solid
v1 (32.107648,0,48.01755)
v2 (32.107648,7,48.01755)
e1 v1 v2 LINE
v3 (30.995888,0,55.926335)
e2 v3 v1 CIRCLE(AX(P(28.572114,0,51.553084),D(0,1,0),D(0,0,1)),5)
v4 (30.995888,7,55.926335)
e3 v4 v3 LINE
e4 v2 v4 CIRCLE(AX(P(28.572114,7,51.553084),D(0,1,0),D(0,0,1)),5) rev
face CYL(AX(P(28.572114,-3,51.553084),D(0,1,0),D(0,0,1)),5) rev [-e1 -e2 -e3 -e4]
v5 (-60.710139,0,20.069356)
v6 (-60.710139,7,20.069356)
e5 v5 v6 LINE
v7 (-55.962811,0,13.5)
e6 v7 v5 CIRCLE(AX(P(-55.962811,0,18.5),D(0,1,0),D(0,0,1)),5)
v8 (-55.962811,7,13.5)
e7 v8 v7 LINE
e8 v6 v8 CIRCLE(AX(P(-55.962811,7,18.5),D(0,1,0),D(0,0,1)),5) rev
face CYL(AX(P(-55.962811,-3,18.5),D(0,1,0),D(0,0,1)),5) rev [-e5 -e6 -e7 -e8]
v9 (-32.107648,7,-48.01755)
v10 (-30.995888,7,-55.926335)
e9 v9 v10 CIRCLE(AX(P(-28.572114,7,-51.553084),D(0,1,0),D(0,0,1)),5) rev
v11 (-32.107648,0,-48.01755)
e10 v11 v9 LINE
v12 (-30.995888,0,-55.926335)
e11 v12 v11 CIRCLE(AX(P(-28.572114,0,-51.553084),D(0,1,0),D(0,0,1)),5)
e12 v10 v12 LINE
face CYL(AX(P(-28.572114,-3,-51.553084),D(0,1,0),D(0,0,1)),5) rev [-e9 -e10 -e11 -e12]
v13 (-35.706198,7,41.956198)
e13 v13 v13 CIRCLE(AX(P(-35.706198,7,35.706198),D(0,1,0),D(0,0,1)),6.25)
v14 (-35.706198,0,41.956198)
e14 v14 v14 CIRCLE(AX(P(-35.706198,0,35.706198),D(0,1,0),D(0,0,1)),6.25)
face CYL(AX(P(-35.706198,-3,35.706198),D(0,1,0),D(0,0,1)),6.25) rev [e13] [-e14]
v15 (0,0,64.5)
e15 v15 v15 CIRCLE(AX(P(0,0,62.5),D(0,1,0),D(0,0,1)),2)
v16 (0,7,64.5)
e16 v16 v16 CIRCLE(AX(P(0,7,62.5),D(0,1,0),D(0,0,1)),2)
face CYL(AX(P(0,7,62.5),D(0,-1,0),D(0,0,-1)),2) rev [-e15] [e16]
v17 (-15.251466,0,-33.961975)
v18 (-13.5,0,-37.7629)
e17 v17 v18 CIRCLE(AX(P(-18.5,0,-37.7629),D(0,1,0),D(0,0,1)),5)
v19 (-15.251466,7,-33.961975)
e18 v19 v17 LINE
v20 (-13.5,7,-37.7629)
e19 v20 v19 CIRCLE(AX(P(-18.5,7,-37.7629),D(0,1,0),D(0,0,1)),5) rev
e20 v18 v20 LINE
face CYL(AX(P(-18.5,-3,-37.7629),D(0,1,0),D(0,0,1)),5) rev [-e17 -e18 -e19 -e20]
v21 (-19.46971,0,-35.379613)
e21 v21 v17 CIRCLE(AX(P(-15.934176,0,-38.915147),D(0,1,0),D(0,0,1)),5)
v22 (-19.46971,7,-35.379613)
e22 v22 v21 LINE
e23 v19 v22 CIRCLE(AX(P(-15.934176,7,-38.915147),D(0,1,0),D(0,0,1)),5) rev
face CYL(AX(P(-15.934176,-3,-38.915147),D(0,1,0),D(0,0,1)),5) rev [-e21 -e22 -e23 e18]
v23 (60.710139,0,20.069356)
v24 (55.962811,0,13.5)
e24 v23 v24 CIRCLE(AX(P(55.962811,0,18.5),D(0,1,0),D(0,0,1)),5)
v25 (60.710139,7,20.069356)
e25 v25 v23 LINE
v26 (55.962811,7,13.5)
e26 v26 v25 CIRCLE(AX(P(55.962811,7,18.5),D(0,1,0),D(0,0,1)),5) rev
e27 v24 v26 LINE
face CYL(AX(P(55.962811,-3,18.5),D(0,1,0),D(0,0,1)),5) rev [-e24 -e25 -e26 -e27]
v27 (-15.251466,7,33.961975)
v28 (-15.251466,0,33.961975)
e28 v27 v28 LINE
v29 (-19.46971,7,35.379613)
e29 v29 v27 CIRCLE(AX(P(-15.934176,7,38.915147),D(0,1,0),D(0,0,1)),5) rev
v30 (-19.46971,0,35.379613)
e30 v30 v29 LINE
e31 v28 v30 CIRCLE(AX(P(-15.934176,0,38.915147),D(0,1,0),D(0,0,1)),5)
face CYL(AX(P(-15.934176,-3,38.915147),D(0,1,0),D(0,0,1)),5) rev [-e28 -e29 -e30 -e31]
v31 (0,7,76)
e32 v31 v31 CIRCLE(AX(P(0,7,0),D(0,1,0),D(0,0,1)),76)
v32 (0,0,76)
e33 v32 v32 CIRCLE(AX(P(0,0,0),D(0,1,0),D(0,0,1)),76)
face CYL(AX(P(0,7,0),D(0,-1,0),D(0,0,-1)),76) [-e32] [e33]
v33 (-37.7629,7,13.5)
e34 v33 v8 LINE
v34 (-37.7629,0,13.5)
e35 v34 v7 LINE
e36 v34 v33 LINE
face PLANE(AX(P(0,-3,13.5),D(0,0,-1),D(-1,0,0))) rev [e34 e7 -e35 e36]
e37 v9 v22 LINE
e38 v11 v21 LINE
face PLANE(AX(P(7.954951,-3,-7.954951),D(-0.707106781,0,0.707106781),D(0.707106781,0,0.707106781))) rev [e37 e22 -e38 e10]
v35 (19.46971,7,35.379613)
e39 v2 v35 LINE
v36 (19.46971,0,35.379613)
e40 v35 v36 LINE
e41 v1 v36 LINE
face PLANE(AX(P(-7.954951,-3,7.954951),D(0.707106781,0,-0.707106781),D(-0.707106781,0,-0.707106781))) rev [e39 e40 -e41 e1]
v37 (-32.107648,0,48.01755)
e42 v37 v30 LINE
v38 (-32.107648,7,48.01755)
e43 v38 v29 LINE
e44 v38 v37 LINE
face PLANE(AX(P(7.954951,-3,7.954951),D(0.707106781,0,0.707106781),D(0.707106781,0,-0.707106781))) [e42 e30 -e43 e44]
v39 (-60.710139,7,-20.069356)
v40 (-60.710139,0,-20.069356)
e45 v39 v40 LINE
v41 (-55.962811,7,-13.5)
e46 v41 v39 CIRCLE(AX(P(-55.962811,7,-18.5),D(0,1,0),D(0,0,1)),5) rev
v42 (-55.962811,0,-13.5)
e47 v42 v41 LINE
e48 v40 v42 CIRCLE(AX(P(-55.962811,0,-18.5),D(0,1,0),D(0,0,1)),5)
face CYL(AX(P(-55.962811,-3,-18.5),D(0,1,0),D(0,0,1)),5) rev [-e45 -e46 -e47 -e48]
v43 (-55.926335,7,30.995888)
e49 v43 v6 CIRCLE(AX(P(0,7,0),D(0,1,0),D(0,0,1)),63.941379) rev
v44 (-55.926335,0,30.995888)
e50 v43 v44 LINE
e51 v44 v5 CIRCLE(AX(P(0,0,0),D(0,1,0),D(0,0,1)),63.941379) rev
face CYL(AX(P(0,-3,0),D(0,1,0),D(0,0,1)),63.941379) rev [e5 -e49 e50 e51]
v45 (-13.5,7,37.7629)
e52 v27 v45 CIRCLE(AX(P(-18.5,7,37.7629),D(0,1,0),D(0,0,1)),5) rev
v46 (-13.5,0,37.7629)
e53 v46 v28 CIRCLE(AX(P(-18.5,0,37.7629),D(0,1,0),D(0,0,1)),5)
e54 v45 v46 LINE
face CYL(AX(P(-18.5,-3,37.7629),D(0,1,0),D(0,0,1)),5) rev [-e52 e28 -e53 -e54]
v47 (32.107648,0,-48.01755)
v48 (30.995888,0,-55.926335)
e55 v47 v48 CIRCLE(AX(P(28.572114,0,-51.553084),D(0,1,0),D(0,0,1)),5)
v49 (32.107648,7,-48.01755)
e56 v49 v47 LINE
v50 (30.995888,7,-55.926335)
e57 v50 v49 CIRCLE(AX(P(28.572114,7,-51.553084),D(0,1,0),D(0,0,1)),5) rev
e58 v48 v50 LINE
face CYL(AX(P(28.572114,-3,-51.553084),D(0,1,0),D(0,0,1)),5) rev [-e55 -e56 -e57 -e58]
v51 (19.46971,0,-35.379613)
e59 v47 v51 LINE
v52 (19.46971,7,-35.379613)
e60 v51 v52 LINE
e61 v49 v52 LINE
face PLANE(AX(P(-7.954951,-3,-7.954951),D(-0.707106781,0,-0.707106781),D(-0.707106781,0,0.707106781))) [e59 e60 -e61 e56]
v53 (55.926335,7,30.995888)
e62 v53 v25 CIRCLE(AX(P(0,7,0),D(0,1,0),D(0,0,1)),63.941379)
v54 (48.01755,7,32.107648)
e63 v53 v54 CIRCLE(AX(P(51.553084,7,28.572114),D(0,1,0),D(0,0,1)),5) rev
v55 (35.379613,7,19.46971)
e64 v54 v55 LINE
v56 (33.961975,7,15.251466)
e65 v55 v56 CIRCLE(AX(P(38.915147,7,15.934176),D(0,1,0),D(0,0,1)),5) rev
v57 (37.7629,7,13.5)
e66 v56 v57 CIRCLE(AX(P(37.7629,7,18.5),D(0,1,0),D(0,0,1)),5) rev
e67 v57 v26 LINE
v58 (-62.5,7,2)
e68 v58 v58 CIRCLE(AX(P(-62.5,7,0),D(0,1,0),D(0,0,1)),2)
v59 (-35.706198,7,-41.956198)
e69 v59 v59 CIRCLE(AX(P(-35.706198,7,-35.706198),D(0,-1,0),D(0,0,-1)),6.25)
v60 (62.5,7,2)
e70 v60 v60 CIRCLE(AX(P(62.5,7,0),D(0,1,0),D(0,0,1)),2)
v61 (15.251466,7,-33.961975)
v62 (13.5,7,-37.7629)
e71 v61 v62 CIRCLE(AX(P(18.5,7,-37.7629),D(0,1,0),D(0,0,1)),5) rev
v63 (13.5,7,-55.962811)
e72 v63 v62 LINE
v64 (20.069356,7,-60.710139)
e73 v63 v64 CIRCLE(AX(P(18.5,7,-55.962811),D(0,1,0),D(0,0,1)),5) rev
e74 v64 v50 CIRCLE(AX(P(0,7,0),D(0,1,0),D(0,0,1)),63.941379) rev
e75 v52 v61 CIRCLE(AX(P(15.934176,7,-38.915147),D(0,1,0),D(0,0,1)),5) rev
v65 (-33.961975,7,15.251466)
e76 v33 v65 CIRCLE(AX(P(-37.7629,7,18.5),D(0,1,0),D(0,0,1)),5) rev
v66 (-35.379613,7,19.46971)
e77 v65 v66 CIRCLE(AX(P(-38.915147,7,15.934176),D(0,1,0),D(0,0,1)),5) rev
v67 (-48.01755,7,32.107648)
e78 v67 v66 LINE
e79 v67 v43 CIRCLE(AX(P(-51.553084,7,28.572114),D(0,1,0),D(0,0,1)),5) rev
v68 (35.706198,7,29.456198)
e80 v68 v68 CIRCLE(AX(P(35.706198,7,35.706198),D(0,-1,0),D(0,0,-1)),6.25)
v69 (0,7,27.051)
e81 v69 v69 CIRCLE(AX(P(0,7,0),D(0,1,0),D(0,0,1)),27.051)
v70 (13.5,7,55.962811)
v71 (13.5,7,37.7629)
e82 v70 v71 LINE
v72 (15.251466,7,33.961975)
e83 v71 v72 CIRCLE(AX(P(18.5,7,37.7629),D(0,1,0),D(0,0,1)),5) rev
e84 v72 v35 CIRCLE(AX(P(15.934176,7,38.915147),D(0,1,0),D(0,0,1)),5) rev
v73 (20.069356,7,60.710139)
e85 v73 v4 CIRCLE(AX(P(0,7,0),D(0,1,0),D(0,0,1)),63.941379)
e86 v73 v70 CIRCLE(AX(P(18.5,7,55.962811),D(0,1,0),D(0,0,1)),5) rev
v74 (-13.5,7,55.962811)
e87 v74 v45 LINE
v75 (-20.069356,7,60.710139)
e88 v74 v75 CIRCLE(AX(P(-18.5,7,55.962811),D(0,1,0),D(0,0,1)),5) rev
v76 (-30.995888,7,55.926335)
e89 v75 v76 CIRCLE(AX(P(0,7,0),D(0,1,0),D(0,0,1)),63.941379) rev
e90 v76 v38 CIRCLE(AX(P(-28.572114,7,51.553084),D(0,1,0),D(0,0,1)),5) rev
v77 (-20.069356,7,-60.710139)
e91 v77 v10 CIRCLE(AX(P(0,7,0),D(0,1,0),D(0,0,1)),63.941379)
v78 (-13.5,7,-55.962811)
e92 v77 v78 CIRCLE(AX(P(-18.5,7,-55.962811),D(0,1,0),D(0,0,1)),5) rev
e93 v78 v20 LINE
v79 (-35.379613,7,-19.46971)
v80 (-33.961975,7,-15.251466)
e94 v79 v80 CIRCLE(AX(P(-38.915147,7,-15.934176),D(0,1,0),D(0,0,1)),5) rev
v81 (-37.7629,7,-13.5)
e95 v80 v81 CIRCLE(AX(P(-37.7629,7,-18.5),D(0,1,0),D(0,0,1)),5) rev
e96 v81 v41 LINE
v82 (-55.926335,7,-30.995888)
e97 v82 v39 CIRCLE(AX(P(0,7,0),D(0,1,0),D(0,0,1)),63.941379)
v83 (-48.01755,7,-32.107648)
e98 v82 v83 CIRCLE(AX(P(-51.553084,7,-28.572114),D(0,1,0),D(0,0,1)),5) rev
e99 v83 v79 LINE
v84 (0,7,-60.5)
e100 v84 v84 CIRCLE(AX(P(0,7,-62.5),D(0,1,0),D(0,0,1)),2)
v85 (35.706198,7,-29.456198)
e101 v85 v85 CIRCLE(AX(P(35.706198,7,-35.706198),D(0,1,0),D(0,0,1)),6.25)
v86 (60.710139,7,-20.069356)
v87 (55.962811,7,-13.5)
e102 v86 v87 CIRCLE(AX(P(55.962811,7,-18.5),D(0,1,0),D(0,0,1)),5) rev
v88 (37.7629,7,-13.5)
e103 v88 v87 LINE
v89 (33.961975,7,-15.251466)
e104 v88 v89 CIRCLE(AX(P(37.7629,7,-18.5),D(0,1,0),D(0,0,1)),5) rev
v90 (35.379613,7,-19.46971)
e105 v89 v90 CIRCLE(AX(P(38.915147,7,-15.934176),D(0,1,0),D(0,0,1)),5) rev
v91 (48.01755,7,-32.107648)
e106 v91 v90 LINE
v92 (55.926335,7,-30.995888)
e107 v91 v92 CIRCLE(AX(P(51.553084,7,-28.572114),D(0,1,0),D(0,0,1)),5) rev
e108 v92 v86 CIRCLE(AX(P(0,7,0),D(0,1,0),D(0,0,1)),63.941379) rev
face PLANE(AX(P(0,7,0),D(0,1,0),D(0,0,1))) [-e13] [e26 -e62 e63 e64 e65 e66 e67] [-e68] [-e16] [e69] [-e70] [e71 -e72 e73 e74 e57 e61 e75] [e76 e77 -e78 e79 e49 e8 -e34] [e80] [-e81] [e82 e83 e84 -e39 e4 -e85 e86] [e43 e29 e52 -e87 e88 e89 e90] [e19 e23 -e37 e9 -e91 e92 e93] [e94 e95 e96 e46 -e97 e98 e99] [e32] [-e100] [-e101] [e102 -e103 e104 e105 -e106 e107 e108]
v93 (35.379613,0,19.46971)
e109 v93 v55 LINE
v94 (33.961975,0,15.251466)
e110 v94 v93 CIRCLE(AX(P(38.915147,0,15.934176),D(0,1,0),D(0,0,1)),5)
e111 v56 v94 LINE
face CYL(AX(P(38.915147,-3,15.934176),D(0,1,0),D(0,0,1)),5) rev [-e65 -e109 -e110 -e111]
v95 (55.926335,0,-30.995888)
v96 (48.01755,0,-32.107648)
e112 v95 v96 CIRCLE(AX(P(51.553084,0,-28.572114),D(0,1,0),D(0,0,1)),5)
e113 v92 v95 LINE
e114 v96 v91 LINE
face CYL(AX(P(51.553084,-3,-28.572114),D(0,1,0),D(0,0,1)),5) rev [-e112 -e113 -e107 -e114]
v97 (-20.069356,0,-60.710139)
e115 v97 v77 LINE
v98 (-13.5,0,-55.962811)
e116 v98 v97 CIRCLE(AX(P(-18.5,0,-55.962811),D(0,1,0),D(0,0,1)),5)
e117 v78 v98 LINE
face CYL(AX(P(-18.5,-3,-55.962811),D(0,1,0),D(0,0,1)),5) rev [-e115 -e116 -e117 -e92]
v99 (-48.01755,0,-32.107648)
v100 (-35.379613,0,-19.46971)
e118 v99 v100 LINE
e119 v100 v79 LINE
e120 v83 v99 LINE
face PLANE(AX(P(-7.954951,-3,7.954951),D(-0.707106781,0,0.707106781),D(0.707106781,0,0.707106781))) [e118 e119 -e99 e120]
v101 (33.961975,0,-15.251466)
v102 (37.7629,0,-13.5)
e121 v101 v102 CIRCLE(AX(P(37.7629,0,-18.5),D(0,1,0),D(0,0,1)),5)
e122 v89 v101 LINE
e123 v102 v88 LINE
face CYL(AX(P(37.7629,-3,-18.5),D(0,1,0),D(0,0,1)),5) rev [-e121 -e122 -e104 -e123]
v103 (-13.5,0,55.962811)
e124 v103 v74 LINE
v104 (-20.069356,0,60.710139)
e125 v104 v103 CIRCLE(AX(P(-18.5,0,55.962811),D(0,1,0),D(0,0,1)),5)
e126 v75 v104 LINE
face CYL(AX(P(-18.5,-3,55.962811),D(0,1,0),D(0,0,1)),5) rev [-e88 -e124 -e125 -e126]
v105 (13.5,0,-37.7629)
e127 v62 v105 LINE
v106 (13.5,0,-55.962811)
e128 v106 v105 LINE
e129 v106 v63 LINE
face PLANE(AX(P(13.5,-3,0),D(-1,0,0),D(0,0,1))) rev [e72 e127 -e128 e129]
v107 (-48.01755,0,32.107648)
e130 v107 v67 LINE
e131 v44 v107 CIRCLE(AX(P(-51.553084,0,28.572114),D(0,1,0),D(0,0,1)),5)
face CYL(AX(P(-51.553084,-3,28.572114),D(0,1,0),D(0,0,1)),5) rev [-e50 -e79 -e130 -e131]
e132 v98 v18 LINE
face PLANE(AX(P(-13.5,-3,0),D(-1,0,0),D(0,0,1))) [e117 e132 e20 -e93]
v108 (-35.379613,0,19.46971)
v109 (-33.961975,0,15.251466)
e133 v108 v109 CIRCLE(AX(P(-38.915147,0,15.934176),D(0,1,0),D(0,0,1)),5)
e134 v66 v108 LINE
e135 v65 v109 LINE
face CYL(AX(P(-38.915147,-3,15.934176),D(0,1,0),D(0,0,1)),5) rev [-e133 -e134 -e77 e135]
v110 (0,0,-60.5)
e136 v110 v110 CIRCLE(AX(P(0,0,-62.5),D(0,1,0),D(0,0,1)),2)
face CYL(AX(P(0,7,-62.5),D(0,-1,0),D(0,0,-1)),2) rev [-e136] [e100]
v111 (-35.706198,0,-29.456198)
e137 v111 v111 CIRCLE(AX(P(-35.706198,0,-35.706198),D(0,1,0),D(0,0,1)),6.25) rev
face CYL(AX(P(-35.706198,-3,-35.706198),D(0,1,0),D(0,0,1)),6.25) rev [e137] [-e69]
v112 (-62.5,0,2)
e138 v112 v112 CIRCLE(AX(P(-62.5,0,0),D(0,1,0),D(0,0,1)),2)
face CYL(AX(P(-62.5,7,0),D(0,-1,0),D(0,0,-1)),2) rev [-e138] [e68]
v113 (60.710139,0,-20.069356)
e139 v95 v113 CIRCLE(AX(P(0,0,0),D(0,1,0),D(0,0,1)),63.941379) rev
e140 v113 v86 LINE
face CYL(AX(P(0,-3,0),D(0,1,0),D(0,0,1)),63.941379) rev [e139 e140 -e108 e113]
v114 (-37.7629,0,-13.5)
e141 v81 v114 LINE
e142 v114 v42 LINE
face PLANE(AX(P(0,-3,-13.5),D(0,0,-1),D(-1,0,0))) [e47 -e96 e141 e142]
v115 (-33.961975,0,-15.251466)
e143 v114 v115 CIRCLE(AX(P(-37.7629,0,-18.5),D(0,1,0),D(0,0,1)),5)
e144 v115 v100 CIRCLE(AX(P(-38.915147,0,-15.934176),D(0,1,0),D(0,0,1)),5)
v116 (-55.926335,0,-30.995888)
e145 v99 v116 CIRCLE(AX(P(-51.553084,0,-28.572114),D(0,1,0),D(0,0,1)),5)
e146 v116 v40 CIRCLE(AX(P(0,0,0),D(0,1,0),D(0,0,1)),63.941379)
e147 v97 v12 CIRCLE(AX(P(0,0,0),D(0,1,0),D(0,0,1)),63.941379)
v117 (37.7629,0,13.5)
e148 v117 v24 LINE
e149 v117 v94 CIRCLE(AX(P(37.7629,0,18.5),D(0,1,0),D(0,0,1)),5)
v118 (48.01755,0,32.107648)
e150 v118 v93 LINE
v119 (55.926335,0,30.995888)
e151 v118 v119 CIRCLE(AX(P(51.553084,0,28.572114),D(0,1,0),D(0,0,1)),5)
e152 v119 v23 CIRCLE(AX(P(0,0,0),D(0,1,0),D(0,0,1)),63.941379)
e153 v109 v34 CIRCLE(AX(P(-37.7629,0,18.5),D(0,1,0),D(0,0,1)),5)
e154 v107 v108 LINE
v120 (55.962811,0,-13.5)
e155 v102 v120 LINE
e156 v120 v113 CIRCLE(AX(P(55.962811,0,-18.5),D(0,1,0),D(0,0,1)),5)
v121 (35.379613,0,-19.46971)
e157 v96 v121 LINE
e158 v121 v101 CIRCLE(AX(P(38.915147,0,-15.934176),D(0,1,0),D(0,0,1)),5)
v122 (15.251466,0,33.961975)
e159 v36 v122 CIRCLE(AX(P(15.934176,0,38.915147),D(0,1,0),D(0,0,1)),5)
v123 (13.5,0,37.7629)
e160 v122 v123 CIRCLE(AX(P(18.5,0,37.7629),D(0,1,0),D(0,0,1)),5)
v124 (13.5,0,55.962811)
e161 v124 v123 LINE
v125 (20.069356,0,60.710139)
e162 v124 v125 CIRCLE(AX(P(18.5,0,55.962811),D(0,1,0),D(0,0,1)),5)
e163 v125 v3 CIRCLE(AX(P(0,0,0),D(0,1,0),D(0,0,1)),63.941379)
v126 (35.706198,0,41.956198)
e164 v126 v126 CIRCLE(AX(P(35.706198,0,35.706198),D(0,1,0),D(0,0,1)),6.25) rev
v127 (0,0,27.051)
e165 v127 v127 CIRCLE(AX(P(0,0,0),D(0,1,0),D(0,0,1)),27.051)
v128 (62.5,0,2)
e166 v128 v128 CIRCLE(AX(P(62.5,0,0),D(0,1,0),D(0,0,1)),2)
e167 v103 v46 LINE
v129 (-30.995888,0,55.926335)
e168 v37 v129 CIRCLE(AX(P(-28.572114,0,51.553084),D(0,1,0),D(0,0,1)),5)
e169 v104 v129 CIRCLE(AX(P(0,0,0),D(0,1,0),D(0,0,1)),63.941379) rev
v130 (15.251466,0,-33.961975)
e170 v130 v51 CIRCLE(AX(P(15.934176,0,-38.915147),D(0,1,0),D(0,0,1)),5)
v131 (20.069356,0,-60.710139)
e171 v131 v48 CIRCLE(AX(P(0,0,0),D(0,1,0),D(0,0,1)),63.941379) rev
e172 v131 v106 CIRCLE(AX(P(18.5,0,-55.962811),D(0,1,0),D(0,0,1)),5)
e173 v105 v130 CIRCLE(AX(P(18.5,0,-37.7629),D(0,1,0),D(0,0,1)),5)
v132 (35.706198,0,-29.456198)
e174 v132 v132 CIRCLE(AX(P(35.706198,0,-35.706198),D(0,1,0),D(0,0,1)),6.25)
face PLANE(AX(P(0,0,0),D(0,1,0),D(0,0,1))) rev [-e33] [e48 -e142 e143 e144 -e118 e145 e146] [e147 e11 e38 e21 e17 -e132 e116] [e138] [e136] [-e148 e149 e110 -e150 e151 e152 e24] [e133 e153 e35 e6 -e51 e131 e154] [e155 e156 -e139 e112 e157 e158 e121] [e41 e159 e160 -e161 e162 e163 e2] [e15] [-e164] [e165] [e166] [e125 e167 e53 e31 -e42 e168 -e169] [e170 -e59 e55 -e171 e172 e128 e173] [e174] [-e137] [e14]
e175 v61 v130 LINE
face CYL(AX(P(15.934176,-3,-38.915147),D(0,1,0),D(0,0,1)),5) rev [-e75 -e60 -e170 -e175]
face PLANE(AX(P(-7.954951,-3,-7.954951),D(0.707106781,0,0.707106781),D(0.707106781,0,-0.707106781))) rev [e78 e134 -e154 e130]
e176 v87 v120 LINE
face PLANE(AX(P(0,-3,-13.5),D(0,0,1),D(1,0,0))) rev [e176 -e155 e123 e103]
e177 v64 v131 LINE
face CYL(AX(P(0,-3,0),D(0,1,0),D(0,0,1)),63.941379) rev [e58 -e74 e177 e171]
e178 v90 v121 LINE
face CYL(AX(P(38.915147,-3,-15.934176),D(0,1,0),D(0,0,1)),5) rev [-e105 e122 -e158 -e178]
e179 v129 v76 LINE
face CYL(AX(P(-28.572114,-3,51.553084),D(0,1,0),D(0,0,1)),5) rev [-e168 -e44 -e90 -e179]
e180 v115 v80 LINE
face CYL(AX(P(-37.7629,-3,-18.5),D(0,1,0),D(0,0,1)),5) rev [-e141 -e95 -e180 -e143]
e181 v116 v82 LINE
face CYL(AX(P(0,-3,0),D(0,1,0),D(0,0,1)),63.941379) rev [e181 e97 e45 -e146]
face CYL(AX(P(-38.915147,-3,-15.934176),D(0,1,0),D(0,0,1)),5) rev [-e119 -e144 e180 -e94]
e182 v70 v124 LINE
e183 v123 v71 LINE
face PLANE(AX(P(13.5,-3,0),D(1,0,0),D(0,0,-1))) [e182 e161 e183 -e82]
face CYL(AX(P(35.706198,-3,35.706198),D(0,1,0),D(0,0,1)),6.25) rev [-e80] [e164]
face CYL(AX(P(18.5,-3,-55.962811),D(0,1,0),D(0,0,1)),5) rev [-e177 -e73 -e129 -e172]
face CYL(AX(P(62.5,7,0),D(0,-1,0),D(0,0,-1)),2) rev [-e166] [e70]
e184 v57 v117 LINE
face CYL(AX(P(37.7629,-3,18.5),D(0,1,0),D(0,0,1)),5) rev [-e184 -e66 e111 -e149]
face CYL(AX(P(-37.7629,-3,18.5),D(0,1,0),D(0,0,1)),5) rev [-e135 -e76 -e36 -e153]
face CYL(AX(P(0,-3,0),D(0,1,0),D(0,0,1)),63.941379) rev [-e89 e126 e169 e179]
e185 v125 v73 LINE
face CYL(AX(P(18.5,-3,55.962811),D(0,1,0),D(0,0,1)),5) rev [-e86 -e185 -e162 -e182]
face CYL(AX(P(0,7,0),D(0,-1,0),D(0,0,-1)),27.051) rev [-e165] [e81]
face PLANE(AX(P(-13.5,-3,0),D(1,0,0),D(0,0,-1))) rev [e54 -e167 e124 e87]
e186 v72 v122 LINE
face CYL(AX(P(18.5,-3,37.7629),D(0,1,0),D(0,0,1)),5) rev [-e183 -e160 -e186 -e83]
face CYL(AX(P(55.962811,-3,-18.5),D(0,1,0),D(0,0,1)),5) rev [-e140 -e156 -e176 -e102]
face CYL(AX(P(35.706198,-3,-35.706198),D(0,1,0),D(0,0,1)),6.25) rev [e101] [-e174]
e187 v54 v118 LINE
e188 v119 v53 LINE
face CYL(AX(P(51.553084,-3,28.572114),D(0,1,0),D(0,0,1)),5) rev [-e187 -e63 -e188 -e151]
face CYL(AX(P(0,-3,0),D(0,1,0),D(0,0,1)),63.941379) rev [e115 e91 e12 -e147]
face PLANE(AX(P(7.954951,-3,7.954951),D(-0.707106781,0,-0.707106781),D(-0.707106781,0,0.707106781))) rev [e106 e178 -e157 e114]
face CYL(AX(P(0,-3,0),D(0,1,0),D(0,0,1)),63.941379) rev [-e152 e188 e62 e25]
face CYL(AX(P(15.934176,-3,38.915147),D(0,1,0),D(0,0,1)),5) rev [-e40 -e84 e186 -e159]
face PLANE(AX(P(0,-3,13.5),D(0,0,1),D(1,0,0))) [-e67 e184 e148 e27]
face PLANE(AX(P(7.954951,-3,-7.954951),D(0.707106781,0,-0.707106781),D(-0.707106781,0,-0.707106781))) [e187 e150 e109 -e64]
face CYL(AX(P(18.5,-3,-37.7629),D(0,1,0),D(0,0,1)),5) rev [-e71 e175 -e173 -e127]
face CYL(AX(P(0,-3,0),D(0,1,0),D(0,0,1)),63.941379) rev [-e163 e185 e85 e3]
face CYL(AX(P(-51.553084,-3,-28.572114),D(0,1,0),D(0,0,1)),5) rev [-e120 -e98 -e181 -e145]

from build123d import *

# Parameters (mm, degrees)
SKETCH1_R           = 76
SKETCH1_R_2         = 27.051
SKETCH1_R_3         = 2
BOSS_EXTRUDE1_DEPTH = 7
SKETCH4_R           = 6.25
CUT_EXTRUDE1_DEPTH  = 10
FILLET1_R           = 5


with BuildPart() as part:
    # Sketch1 → Boss-Extrude1 (new body)
    with BuildSketch(Plane(origin=(0, 0, 0), x_dir=(1, 0, 0), z_dir=(0, 1, 0))):
        with Locations(Location((0, 0, 0), (0, 0, 270))):
            Circle(SKETCH1_R)
        with Locations(Location((0, 0, 0), (0, 0, 270))):
            Circle(SKETCH1_R_2, mode=Mode.SUBTRACT)
        with Locations(Location((0, 62.5, 0), (0, 0, 270))):
            Circle(SKETCH1_R_3, mode=Mode.SUBTRACT)
        with Locations(Location((62.5, 0, 0), (0, 0, 270))):
            Circle(SKETCH1_R_3, mode=Mode.SUBTRACT)
        with Locations(Location((0, -62.5, 0), (0, 0, 270))):
            Circle(SKETCH1_R_3, mode=Mode.SUBTRACT)
        with Locations(Location((-62.5, 0, 0), (0, 0, 270))):
            Circle(SKETCH1_R_3, mode=Mode.SUBTRACT)
    extrude(amount=BOSS_EXTRUDE1_DEPTH)

    # Sketch4 → Cut-Extrude1 (cut)
    with BuildSketch(Plane(origin=(0, 7, 0), x_dir=(1, 0, 0), z_dir=(0, 1, 0))):
        with BuildLine():
            Line((27.751246841, -43.661149418), (17.007161012, -32.917063589))
            ThreePointArc((17.007161012, -32.917063589), (15.274204293, -33.756114768), (13.5, -34.504008477))
            Line((13.5, -34.504008477), (13.5, -62.5))
            ThreePointArc((13.5, -62.5), (25.524772494, -58.625813335), (36.553123822, -52.463026398))
            Line((36.553123822, -52.463026398), (27.751246841, -43.661149418))
        make_face()
        with BuildLine():
            Line((62.5, -13.5), (34.504008477, -13.5))
            ThreePointArc((34.504008477, -13.5), (33.756114768, -15.274204293), (32.917063589, -17.007161012))
            Line((32.917063589, -17.007161012), (43.66114941, -27.751246833))
            Line((43.66114941, -27.751246833), (52.463026398, -36.553123822))
            ThreePointArc((52.463026398, -36.553123822), (58.625813335, -25.524772494), (62.5, -13.5))
        make_face()
        with BuildLine():
            ThreePointArc((-13.5, -34.504008477), (-15.274204293, -33.756114768), (-17.007161012, -32.917063589))
            Line((-17.007161012, -32.917063589), (-27.751246874, -43.66114945))
            Line((-27.751246874, -43.66114945), (-36.553123822, -52.463026398))
            ThreePointArc((-36.553123822, -52.463026398), (-25.524772494, -58.625813335), (-13.5, -62.5))
            Line((-13.5, -62.5), (-13.5, -34.504008477))
        make_face()
        with BuildLine():
            ThreePointArc((-32.917063589, -17.007161012), (-33.756114768, -15.274204293), (-34.504008477, -13.5))
            Line((-34.504008477, -13.5), (-62.5, -13.5))
            ThreePointArc((-62.5, -13.5), (-58.625813335, -25.524772494), (-52.463026398, -36.553123822))
            Line((-52.463026398, -36.553123822), (-43.661149471, -27.751246894))
            Line((-43.661149471, -27.751246894), (-32.917063589, -17.007161012))
        make_face()
        with BuildLine():
            ThreePointArc((-34.504008477, 13.5), (-33.756114768, 15.274204293), (-32.917063589, 17.007161012))
            Line((-32.917063589, 17.007161012), (-43.66114943, 27.751246854))
            Line((-43.66114943, 27.751246854), (-52.463026398, 36.553123822))
            ThreePointArc((-52.463026398, 36.553123822), (-58.625813335, 25.524772494), (-62.5, 13.5))
            Line((-62.5, 13.5), (-34.504008477, 13.5))
        make_face()
        with BuildLine():
            ThreePointArc((-17.007161012, 32.917063589), (-15.274204293, 33.756114768), (-13.5, 34.504008477))
            Line((-13.5, 34.504008477), (-13.5, 62.5))
            ThreePointArc((-13.5, 62.5), (-25.524772494, 58.625813335), (-36.553123822, 52.463026398))
            Line((-36.553123822, 52.463026398), (-27.751246874, 43.66114945))
            Line((-27.751246874, 43.66114945), (-17.007161012, 32.917063589))
        make_face()
        with BuildLine():
            ThreePointArc((36.553123822, 52.463026398), (25.524772494, 58.625813335), (13.5, 62.5))
            Line((13.5, 62.5), (13.5, 34.504008477))
            ThreePointArc((13.5, 34.504008477), (15.274204293, 33.756114768), (17.007161012, 32.917063589))
            Line((17.007161012, 32.917063589), (27.751246906, 43.661149483))
            Line((27.751246906, 43.661149483), (36.553123822, 52.463026398))
        make_face()
        with BuildLine():
            ThreePointArc((62.5, 13.5), (58.625813335, 25.524772494), (52.463026398, 36.553123822))
            Line((52.463026398, 36.553123822), (43.66114945, 27.751246874))
            Line((43.66114945, 27.751246874), (32.917063589, 17.007161012))
            ThreePointArc((32.917063589, 17.007161012), (33.756114768, 15.274204293), (34.504008477, 13.5))
            Line((34.504008477, 13.5), (62.5, 13.5))
        make_face()
        with Locations(Location((35.706198162, 35.706198162, 0), (0, 0, 270))):
            Circle(SKETCH4_R)
        with Locations(Location((35.706198162, -35.706198162, 0), (0, 0, 270))):
            Circle(SKETCH4_R)
        with Locations(Location((-35.706198162, -35.706198162, 0), (0, 0, 270))):
            Circle(SKETCH4_R)
        with Locations(Location((-35.706198162, 35.706198162, 0), (0, 0, 270))):
            Circle(SKETCH4_R)
    extrude(amount=-CUT_EXTRUDE1_DEPTH, mode=Mode.SUBTRACT)

    # Fillet1
    # the kernel refuses this fillet: 5 mm, written as the material it adds along each edge
    with BuildSketch(Plane(origin=(34.504008477, 7, 13.5), x_dir=(1, 0, 0), z_dir=(0, -1, 0)), Plane(origin=(13.5, 7, -34.504008477), x_dir=(0, 0, -1), z_dir=(0, -1, 0)), Plane(origin=(-34.504008477, 7, -13.5), x_dir=(-1, 0, 0), z_dir=(0, -1, 0)), Plane(origin=(-13.5, 7, 34.504008477), x_dir=(0, 0, 1), z_dir=(0, -1, 0))) as fillet1_piece_1:
        with BuildLine():
            CenterArc((3.258891319, 5), FILLET1_R, 206.100178987, 63.899821013)
            ThreePointArc((-1.231239688, 2.800290124), (-0.586707725, 1.412857227), (0, 0))
            Line((0, 0), (3.258891319, 0))
        make_face()
    extrude(amount=7)
    with BuildSketch(Plane(origin=(62.5, 7, 13.5), x_dir=(-1, 0, 0), z_dir=(0, -1, 0))) as fillet1_piece_2:
        with BuildLine():
            CenterArc((6.537189081, -5), FILLET1_R, 90, 108.2926811)
            ThreePointArc((1.789861186, -6.569355874), (0.807426008, -3.308519097), (0, 0))
            Line((0, 0), (6.537189081, 0))
        make_face()
    extrude(amount=7)
    with BuildSketch(Plane(origin=(52.463026398, 7, 36.553123822), x_dir=(-0.7071067811865521, 0, -0.707106781186543), z_dir=(0, -1, 0)), Plane(origin=(-36.553123822, 7, 52.463026398), x_dir=(0.7071067811865515, 0, -0.7071067811865436), z_dir=(0, -1, 0))) as fillet1_piece_3:
        with BuildLine():
            CenterArc((6.286852353, 5), FILLET1_R, 163.996405934, 106.003594066)
            ThreePointArc((1.480630334, 6.378488268), (0.658610883, 3.208210045), (0, 0))
            Line((0, 0), (6.286852353, 0))
        make_face()
    extrude(amount=7)
    with BuildSketch(Plane(origin=(32.917063589, 7, 17.007161012), x_dir=(0.4193809358930841, 0, -0.907810349472532), z_dir=(0, -1, 0)), Plane(origin=(17.007161012, 7, -32.917063589), x_dir=(-0.9078103494725283, 0, -0.41938093589309267), z_dir=(0, -1, 0)), Plane(origin=(-32.917063589, 7, -17.007161012), x_dir=(-0.4193809358930852, 0, 0.9078103494725317), z_dir=(0, -1, 0))) as fillet1_piece_4:
        with BuildLine():
            CenterArc((3.489548398, 4.995132399), FILLET1_R, 200.204490443, 67.267112024)
            Line((-1.202781391, 3.268273647), (0, 0))
            ThreePointArc((0, 0), (1.634487847, 0.036069898), (3.268975694, 0))
        make_face()
    extrude(amount=7)
    with BuildSketch(Plane(origin=(32.917063589, 7, -17.007161012), x_dir=(0.7071067811865526, 0, -0.7071067811865425), z_dir=(0, -1, 0)), Plane(origin=(-17.007161012, 7, -32.917063589), x_dir=(-0.7071067811865506, 0, -0.7071067811865445), z_dir=(0, -1, 0)), Plane(origin=(-32.917063589, 7, 17.007161012), x_dir=(-0.7071067811865506, 0, 0.7071067811865445), z_dir=(0, -1, 0)), Plane(origin=(17.007161012, 7, 32.917063589), x_dir=(0.7071067811865501, 0, 0.707106781186545), z_dir=(0, -1, 0))) as fillet1_piece_5:
        with BuildLine():
            CenterArc((3.482570273, 5), FILLET1_R, 202.732887976, 67.267112024)
            ThreePointArc((-1.129011858, 3.067822406), (-0.530655558, 1.546368727), (0, 0))
            Line((0, 0), (3.482570273, 0))
        make_face()
    extrude(amount=7)
    with BuildSketch(Plane(origin=(34.504008477, 7, -13.5), x_dir=(1, 0, 0), z_dir=(0, -1, 0))) as fillet1_piece_6:
        with BuildLine():
            CenterArc((3.258891319, -5), FILLET1_R, 90, 63.899821013)
            ThreePointArc((-1.231239688, -2.800290124), (-0.586707725, -1.412857227), (0, 0))
            Line((0, 0), (3.258891319, 0))
        make_face()
    extrude(amount=7)
    with BuildSketch(Plane(origin=(62.5, 7, -13.5), x_dir=(-1, 0, 0), z_dir=(0, -1, 0)), Plane(origin=(-13.5, 7, -62.5), x_dir=(0, 0, 1), z_dir=(0, -1, 0)), Plane(origin=(-62.5, 7, 13.5), x_dir=(1, 0, 0), z_dir=(0, -1, 0)), Plane(origin=(13.5, 7, 62.5), x_dir=(0, 0, -1), z_dir=(0, -1, 0))) as fillet1_piece_7:
        with BuildLine():
            CenterArc((6.537189081, 5), FILLET1_R, 161.7073189, 108.2926811)
            ThreePointArc((1.789861186, 6.569355874), (0.807426008, 3.308519097), (0, 0))
            Line((0, 0), (6.537189081, 0))
        make_face()
    extrude(amount=7)
    with BuildSketch(Plane(origin=(52.463026398, 7, -36.553123822), x_dir=(0.5289042688396526, 0, 0.848681491728901), z_dir=(0, -1, 0))) as fillet1_piece_8:
        with BuildLine():
            CenterArc((6.292063112, 4.993441128), FILLET1_R, 166.931450544, 106.003594066)
            Line((1.421561948, 6.124024341), (0, 0))
            ThreePointArc((0, 0), (3.274041034, -0.08387667), (6.548082068, 0))
        make_face()
    extrude(amount=7)
    with BuildSketch(Plane(origin=(36.553123822, 7, -52.463026398), x_dir=(-0.8486814917288963, 0, -0.52890426883966), z_dir=(0, -1, 0)), Plane(origin=(-52.463026398, 7, -36.553123822), x_dir=(-0.5289042688396536, 0, 0.8486814917289003), z_dir=(0, -1, 0))) as fillet1_piece_9:
        with BuildLine():
            CenterArc((6.292063112, -4.993441128), FILLET1_R, 87.06495539, 106.003594066)
            Line((1.421561948, -6.124024341), (0, 0))
            ThreePointArc((0, 0), (3.274041034, 0.08387667), (6.548082068, 0))
        make_face()
    extrude(amount=7)
    with BuildSketch(Plane(origin=(13.5, 7, -62.5), x_dir=(0.9648302017860143, 0, 0.26287388938720957), z_dir=(0, -1, 0)), Plane(origin=(-62.5, 7, -13.5), x_dir=(0.2628738893872084, 0, -0.9648302017860146), z_dir=(0, -1, 0)), Plane(origin=(-13.5, 7, 62.5), x_dir=(-0.9648302017860145, 0, -0.26287388938720885), z_dir=(0, -1, 0))) as fillet1_piece_10:
        with BuildLine():
            CenterArc((6.542607328, 4.992908013), FILLET1_R, 164.759342849, 108.2926811)
            Line((1.718456319, 6.30727746), (0, 0))
            ThreePointArc((0, 0), (3.404410363, -0.090694285), (6.808820725, 0))
        make_face()
    extrude(amount=7)
    with BuildSketch(Plane(origin=(-36.553123822, 7, -52.463026398), x_dir=(0.707106781186552, 0, 0.7071067811865429), z_dir=(0, -1, 0)), Plane(origin=(-52.463026398, 7, 36.553123822), x_dir=(0.7071067811865515, 0, -0.7071067811865436), z_dir=(0, -1, 0)), Plane(origin=(36.553123822, 7, 52.463026398), x_dir=(-0.7071067811865527, 0, -0.7071067811865425), z_dir=(0, -1, 0))) as fillet1_piece_11:
        with BuildLine():
            CenterArc((6.286852353, -5), FILLET1_R, 90, 106.003594066)
            ThreePointArc((1.480630334, -6.378488268), (0.658610883, -3.208210045), (0, 0))
            Line((0, 0), (6.286852353, 0))
        make_face()
    extrude(amount=7)
    with BuildSketch(Plane(origin=(-13.5, 7, -34.504008477), x_dir=(-0.9154220062230544, 0, 0.4024954043496127), z_dir=(0, -1, 0)), Plane(origin=(-34.504008477, 7, 13.5), x_dir=(0.4024954043496181, 0, 0.915422006223052), z_dir=(0, -1, 0)), Plane(origin=(13.5, 7, 34.504008477), x_dir=(0.915422006223051, 0, -0.40249540434962), z_dir=(0, -1, 0))) as fillet1_piece_12:
        with BuildLine():
            CenterArc((3.265421252, 4.995737851), FILLET1_R, 203.734271223, 63.899821013)
            Line((-1.311688779, 2.983260829), (0, 0))
            ThreePointArc((0, 0), (1.52950776, 0.031583378), (3.059015519, 0))
        make_face()
    extrude(amount=7)
    with BuildSketch(Plane(origin=(-17.007161012, 7, 32.917063589), x_dir=(-0.7071067811865496, 0, 0.7071067811865455), z_dir=(0, -1, 0))) as fillet1_piece_13:
        with BuildLine():
            CenterArc((3.482570273, -5), FILLET1_R, 90, 67.267112024)
            ThreePointArc((-1.129011858, -3.067822406), (-0.530655558, -1.546368727), (0, 0))
            Line((0, 0), (3.482570273, 0))
        make_face()
    extrude(amount=7)


solid = part.part
